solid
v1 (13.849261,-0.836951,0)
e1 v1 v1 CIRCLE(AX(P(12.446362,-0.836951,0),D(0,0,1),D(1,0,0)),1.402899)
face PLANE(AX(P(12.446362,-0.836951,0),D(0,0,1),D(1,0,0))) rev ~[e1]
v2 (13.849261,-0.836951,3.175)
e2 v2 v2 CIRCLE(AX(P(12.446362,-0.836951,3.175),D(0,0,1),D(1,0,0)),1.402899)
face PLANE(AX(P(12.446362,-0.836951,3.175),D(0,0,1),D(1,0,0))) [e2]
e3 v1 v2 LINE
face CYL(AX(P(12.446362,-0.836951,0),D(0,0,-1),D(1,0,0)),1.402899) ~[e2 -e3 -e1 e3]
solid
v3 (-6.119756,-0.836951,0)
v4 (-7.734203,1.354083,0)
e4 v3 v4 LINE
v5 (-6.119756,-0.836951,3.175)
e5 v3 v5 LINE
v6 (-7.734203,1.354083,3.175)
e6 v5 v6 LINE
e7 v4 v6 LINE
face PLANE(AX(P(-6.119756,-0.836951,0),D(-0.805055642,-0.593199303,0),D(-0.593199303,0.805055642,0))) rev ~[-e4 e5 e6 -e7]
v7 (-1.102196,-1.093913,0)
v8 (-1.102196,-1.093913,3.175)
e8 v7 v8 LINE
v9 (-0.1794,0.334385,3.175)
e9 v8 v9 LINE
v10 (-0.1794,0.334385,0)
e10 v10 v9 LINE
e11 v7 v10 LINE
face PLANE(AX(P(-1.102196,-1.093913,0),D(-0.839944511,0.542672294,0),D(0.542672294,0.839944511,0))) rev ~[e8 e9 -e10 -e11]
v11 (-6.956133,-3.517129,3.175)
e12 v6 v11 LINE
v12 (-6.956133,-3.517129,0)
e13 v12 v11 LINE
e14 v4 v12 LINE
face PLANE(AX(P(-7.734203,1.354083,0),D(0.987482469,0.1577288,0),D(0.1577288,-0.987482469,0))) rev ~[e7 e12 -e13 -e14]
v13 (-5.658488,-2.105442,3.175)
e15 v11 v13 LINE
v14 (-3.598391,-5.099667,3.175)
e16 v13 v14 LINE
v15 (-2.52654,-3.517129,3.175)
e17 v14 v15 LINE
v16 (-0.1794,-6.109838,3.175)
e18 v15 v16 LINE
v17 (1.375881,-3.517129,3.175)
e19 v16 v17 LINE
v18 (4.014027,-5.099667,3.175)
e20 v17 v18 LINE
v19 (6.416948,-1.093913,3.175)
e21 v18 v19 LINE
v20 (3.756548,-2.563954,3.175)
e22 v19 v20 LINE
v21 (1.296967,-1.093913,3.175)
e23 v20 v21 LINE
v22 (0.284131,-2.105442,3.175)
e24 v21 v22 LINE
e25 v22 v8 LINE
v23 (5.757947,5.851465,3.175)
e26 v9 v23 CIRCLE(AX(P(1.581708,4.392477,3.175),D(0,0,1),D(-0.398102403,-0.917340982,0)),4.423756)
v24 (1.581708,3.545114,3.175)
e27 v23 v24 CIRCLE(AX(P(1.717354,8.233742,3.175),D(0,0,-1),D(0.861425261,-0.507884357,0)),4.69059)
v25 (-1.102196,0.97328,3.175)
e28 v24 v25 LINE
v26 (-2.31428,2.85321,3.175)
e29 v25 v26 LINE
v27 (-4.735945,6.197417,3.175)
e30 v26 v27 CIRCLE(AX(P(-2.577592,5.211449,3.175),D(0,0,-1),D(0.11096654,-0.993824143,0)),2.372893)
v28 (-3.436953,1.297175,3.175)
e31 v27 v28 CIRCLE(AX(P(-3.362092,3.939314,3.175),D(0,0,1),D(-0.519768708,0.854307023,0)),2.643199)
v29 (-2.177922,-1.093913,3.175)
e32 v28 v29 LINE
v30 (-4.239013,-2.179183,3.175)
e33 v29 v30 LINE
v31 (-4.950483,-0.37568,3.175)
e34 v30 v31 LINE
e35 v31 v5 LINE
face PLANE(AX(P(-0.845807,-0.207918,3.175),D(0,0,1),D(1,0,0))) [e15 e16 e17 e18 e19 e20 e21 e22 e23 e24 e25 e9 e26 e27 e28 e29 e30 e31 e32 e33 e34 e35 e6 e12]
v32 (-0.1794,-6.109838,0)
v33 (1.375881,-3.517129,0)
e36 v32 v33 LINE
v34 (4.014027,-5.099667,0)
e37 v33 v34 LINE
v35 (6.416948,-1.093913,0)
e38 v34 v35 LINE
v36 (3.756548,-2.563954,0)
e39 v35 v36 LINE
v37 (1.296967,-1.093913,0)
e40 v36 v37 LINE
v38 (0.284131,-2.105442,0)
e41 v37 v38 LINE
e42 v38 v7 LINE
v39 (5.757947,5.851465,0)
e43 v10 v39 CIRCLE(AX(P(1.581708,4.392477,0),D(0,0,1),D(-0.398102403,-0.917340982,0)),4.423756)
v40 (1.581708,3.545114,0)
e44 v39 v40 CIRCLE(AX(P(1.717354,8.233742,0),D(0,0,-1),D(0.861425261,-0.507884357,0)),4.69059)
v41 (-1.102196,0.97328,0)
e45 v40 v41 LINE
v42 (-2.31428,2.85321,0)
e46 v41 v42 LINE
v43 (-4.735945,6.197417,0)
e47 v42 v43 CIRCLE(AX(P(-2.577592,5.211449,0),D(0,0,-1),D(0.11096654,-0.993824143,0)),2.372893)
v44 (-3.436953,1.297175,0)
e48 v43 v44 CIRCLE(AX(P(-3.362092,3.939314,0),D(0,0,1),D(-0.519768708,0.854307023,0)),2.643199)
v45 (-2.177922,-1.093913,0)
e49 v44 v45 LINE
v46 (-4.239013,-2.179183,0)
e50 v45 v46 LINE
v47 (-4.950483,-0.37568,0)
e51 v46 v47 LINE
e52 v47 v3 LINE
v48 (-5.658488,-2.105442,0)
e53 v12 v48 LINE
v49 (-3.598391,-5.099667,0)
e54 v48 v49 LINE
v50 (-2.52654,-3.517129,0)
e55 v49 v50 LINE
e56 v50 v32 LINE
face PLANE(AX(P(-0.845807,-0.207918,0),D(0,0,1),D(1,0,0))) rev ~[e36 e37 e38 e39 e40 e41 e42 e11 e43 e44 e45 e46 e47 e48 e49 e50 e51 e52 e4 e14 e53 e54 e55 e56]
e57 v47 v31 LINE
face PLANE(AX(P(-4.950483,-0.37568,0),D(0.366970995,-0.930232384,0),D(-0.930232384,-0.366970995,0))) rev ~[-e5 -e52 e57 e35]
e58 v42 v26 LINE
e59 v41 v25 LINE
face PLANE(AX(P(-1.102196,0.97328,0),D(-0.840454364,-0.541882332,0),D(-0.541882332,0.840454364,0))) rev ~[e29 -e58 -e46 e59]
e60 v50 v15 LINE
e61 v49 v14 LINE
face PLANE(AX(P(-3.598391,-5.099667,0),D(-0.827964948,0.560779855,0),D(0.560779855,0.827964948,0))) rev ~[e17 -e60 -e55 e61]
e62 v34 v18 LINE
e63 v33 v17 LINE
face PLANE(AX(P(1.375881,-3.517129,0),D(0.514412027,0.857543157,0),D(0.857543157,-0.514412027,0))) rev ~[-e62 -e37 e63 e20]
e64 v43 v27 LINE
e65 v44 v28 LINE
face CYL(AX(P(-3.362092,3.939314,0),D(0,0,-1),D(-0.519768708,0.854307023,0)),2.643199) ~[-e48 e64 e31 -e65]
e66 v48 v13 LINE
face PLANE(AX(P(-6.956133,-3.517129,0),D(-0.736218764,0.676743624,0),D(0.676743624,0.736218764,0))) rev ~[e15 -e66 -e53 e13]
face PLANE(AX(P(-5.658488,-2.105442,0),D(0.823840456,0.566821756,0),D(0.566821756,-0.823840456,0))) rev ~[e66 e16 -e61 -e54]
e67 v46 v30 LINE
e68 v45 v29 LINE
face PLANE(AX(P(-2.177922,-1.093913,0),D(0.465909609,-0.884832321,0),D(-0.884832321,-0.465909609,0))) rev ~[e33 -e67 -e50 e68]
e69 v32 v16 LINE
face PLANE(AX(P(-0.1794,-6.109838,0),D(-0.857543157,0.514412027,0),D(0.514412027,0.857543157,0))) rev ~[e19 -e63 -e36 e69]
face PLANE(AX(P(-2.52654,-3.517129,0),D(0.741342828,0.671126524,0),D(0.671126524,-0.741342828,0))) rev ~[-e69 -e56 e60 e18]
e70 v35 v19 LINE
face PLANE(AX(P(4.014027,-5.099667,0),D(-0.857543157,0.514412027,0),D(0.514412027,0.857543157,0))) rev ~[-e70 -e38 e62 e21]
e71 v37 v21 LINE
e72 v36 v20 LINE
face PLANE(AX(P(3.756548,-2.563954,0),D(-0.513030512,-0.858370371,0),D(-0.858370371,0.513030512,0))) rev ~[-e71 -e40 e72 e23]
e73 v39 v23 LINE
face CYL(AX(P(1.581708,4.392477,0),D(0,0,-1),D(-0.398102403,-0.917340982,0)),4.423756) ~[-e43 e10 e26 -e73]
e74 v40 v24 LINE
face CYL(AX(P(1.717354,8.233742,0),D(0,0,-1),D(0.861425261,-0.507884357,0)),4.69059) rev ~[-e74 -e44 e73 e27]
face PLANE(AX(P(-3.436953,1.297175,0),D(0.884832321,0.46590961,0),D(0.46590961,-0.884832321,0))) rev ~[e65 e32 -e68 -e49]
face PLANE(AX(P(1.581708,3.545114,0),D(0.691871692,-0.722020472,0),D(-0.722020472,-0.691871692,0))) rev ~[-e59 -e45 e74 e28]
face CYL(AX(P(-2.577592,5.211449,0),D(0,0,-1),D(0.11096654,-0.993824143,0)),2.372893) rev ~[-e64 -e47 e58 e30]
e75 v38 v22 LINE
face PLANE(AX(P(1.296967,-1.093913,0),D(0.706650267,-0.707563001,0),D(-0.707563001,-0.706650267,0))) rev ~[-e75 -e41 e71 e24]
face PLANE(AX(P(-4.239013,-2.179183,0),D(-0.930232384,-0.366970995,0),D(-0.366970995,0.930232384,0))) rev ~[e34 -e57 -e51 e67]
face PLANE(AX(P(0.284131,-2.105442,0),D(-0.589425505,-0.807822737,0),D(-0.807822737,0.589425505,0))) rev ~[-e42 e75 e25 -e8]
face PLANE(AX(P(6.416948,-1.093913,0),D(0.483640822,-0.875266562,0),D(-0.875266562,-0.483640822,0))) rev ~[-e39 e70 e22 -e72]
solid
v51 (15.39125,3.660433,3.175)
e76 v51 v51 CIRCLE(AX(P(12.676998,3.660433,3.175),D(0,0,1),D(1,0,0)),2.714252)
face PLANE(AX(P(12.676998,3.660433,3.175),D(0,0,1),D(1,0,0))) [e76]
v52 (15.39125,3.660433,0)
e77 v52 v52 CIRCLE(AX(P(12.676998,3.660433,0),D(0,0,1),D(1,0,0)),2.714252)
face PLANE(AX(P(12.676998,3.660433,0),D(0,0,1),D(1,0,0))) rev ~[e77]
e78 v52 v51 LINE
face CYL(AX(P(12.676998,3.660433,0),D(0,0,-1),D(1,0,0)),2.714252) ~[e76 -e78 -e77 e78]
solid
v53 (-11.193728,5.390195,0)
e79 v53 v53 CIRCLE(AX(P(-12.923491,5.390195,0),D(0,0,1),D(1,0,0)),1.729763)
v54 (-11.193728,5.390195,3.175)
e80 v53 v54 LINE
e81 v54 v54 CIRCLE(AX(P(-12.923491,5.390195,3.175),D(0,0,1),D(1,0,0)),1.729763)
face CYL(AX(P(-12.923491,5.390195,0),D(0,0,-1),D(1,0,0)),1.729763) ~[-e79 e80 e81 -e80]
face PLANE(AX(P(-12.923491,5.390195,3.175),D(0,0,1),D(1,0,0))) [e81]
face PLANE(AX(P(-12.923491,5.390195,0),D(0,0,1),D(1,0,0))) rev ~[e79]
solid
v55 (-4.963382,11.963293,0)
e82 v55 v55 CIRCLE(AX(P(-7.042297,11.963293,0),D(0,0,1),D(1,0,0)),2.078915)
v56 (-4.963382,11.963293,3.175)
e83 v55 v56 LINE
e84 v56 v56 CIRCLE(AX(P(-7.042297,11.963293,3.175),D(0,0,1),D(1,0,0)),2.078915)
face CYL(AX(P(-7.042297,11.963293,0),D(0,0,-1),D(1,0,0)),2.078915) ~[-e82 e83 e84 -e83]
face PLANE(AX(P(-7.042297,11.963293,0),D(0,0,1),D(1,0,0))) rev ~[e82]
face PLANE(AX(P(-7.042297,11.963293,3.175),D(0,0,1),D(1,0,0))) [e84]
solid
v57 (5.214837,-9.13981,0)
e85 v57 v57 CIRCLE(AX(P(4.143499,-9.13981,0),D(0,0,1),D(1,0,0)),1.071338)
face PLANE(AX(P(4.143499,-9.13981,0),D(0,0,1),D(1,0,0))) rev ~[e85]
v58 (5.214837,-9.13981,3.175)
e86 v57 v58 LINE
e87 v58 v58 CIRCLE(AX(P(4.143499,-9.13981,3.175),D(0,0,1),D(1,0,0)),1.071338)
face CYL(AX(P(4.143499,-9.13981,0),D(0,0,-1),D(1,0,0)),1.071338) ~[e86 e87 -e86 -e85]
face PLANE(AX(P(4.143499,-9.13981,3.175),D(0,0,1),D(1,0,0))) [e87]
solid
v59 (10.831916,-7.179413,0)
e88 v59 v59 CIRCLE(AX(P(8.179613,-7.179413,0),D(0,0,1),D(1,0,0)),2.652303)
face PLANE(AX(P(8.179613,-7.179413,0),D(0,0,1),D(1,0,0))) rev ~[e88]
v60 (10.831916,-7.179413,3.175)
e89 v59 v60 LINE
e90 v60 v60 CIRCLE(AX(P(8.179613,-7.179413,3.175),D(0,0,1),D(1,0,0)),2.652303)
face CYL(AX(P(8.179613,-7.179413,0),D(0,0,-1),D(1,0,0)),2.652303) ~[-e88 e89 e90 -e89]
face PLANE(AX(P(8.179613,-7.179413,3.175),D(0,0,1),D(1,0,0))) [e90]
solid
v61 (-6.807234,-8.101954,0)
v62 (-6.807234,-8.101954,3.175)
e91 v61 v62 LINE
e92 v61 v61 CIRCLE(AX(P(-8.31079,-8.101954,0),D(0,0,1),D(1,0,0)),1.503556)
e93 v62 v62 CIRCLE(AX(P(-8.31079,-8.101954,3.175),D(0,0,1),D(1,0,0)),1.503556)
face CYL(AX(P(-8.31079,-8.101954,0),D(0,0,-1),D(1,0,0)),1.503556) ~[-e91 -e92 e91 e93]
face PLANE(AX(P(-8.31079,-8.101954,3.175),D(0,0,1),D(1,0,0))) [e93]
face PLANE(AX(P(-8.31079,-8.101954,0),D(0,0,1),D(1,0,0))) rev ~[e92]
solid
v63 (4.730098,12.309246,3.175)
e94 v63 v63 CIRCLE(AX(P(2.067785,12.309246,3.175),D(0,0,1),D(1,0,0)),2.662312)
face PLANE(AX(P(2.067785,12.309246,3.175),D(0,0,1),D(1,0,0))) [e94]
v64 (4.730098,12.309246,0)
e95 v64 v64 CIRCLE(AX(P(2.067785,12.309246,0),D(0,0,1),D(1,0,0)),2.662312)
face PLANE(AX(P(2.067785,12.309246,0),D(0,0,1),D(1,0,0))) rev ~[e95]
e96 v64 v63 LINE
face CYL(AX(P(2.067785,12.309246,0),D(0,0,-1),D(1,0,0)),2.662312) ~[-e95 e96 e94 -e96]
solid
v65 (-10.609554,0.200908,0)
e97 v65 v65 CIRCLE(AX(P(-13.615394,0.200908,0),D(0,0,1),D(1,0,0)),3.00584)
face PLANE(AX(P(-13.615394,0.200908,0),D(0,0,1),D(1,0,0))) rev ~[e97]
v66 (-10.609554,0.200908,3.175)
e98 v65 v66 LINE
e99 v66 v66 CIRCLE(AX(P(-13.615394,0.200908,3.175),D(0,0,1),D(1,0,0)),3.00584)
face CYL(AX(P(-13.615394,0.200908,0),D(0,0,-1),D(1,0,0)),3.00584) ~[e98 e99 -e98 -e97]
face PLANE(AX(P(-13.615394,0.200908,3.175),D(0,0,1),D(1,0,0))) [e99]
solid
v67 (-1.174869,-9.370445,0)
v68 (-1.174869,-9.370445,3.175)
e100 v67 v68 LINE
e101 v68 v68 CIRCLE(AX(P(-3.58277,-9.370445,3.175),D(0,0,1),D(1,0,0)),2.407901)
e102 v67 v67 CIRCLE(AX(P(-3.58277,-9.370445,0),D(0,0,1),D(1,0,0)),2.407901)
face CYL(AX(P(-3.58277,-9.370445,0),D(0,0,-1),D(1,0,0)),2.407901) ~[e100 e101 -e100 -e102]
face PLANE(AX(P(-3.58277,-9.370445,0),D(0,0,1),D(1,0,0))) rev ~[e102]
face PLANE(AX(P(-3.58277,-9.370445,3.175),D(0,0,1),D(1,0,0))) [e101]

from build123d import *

# Parameters (mm, degrees)
F1_DEPTH = 3.175
F0_R     = 3.0058400938
F0_R_2   = 1.7297628863
F0_R_3   = 2.0789147202
F0_R_4   = 2.6623124831
F0_R_5   = 2.7142518638
F0_R_6   = 1.4028991856
F0_R_7   = 2.6523027823
F0_R_8   = 1.0713376485
F0_R_9   = 2.4079005593
F0_R_10  = 1.503555761


# Not quite as in the source:
# - a feature names something its author has since deleted; it is built from what else it names


with BuildPart() as f1:
    # F0 (on Top) → F1 (new body)
    with BuildSketch(Plane.XY):
        with BuildLine():
            Line((-6.1197558618, -0.8369509036), (-7.7342026882, 1.354082565))
            Line((-7.7342026882, 1.354082565), (-6.9561327472, -3.5171294496))
            Line((-6.9561327472, -3.5171294496), (-5.6584882394, -2.105442362))
            Line((-5.6584882394, -2.105442362), (-3.5983910284, -5.0996665728))
            Line((-3.5983910284, -5.0996665728), (-2.5265401718, -3.5171294496))
            Line((-2.5265401718, -3.5171294496), (-0.1793996592, -6.1098384625))
            Line((-0.1793996592, -6.1098384625), (1.3758814801, -3.5171294496))
            Line((1.3758814801, -3.5171294496), (4.0140271882, -5.0996665728))
            Line((4.0140271882, -5.0996665728), (6.4169475934, -1.0939127355))
            Line((6.4169475934, -1.0939127355), (3.7565478899, -2.5639539262))
            Line((3.7565478899, -2.5639539262), (1.296967469, -1.0939127355))
            Line((1.296967469, -1.0939127355), (0.2841313167, -2.105442362))
            Line((0.2841313167, -2.105442362), (-1.1021959199, -1.0939127355))
            Line((-1.1021959199, -1.0939127355), (-0.1793996592, 0.3343850841))
            ThreePointArc((-0.1793996592, 0.3343850841), (4.5929798172, 1.1518206005), (5.7579467259, 5.8514651393))
            ThreePointArc((5.7579467259, 5.8514651393), (3.9849443716, 4.1276898045), (1.5817080986, 3.5451143423))
            Line((1.5817080986, 3.5451143423), (-1.1021959199, 0.9732797643))
            Line((-1.1021959199, 0.9732797643), (-2.3142797951, 2.8532103717))
            ThreePointArc((-2.3142797951, 2.8532103717), (-4.499498148, 3.8197245452), (-4.735944538, 6.1974171246))
            ThreePointArc((-4.735944538, 6.1974171246), (-5.9170454131, 3.2620282391), (-3.4369527023, 1.2971752339))
            Line((-3.4369527023, 1.2971752339), (-2.1779222215, -1.0939127355))
            Line((-2.1779222215, -1.0939127355), (-4.2390126121, -2.1791825618))
            Line((-4.2390126121, -2.1791825618), (-4.9504833449, -0.3756800361))
            Line((-4.9504833449, -0.3756800361), (-6.1197558618, -0.8369509036))
        make_face()
    extrude(amount=F1_DEPTH)


with BuildPart() as f1b:
    # F0 (on Top) → F1, piece 2 (new body)
    with BuildSketch(Plane.XY):
        with Locations((-13.6153940494, 0.2009075893)):
            Circle(F0_R)
    extrude(amount=F1_DEPTH)


with BuildPart() as f1c:
    # F0 (on Top) → F1, piece 3 (new body)
    with BuildSketch(Plane.XY):
        with Locations((-12.9234905016, 5.3901949799)):
            Circle(F0_R_2)
    extrude(amount=F1_DEPTH)


with BuildPart() as f1d:
    # F0 (on Top) → F1, piece 4 (new body)
    with BuildSketch(Plane.XY):
        with Locations((-7.0422970263, 11.9632928487)):
            Circle(F0_R_3)
    extrude(amount=F1_DEPTH)


with BuildPart() as f1e:
    # F0 (on Top) → F1, piece 5 (new body)
    with BuildSketch(Plane.XY):
        with Locations((2.0677854507, 12.3092456796)):
            Circle(F0_R_4)
    extrude(amount=F1_DEPTH)


with BuildPart() as f1f:
    # F0 (on Top) → F1, piece 6 (new body)
    with BuildSketch(Plane.XY):
        with Locations((12.6769982713, 3.6604325164)):
            Circle(F0_R_5)
    extrude(amount=F1_DEPTH)


with BuildPart() as f1g:
    # F0 (on Top) → F1, piece 7 (new body)
    with BuildSketch(Plane.XY):
        with Locations((12.4463619232, -0.8369509036)):
            Circle(F0_R_6)
    extrude(amount=F1_DEPTH)


with BuildPart() as f1h:
    # F0 (on Top) → F1, piece 8 (new body)
    with BuildSketch(Plane.XY):
        with Locations((8.1796131601, -7.1794132698)):
            Circle(F0_R_7)
    extrude(amount=F1_DEPTH)


with BuildPart() as f1i:
    # F0 (on Top) → F1, piece 9 (new body)
    with BuildSketch(Plane.XY):
        with Locations((4.1434990539, -9.1398103902)):
            Circle(F0_R_8)
    extrude(amount=F1_DEPTH)


with BuildPart() as f1j:
    # F0 (on Top) → F1, piece 10 (new body)
    with BuildSketch(Plane.XY):
        with Locations((-3.5827695623, -9.3704450471)):
            Circle(F0_R_9)
    extrude(amount=F1_DEPTH)


with BuildPart() as f1k:
    # F0 (on Top) → F1, piece 11 (new body)
    with BuildSketch(Plane.XY):
        with Locations((-8.3107901761, -8.1019535886)):
            Circle(F0_R_10)
    extrude(amount=F1_DEPTH)


solid = Compound([f1.part, f1b.part, f1c.part, f1d.part, f1e.part, f1f.part, f1g.part, f1h.part, f1i.part, f1j.part, f1k.part])
